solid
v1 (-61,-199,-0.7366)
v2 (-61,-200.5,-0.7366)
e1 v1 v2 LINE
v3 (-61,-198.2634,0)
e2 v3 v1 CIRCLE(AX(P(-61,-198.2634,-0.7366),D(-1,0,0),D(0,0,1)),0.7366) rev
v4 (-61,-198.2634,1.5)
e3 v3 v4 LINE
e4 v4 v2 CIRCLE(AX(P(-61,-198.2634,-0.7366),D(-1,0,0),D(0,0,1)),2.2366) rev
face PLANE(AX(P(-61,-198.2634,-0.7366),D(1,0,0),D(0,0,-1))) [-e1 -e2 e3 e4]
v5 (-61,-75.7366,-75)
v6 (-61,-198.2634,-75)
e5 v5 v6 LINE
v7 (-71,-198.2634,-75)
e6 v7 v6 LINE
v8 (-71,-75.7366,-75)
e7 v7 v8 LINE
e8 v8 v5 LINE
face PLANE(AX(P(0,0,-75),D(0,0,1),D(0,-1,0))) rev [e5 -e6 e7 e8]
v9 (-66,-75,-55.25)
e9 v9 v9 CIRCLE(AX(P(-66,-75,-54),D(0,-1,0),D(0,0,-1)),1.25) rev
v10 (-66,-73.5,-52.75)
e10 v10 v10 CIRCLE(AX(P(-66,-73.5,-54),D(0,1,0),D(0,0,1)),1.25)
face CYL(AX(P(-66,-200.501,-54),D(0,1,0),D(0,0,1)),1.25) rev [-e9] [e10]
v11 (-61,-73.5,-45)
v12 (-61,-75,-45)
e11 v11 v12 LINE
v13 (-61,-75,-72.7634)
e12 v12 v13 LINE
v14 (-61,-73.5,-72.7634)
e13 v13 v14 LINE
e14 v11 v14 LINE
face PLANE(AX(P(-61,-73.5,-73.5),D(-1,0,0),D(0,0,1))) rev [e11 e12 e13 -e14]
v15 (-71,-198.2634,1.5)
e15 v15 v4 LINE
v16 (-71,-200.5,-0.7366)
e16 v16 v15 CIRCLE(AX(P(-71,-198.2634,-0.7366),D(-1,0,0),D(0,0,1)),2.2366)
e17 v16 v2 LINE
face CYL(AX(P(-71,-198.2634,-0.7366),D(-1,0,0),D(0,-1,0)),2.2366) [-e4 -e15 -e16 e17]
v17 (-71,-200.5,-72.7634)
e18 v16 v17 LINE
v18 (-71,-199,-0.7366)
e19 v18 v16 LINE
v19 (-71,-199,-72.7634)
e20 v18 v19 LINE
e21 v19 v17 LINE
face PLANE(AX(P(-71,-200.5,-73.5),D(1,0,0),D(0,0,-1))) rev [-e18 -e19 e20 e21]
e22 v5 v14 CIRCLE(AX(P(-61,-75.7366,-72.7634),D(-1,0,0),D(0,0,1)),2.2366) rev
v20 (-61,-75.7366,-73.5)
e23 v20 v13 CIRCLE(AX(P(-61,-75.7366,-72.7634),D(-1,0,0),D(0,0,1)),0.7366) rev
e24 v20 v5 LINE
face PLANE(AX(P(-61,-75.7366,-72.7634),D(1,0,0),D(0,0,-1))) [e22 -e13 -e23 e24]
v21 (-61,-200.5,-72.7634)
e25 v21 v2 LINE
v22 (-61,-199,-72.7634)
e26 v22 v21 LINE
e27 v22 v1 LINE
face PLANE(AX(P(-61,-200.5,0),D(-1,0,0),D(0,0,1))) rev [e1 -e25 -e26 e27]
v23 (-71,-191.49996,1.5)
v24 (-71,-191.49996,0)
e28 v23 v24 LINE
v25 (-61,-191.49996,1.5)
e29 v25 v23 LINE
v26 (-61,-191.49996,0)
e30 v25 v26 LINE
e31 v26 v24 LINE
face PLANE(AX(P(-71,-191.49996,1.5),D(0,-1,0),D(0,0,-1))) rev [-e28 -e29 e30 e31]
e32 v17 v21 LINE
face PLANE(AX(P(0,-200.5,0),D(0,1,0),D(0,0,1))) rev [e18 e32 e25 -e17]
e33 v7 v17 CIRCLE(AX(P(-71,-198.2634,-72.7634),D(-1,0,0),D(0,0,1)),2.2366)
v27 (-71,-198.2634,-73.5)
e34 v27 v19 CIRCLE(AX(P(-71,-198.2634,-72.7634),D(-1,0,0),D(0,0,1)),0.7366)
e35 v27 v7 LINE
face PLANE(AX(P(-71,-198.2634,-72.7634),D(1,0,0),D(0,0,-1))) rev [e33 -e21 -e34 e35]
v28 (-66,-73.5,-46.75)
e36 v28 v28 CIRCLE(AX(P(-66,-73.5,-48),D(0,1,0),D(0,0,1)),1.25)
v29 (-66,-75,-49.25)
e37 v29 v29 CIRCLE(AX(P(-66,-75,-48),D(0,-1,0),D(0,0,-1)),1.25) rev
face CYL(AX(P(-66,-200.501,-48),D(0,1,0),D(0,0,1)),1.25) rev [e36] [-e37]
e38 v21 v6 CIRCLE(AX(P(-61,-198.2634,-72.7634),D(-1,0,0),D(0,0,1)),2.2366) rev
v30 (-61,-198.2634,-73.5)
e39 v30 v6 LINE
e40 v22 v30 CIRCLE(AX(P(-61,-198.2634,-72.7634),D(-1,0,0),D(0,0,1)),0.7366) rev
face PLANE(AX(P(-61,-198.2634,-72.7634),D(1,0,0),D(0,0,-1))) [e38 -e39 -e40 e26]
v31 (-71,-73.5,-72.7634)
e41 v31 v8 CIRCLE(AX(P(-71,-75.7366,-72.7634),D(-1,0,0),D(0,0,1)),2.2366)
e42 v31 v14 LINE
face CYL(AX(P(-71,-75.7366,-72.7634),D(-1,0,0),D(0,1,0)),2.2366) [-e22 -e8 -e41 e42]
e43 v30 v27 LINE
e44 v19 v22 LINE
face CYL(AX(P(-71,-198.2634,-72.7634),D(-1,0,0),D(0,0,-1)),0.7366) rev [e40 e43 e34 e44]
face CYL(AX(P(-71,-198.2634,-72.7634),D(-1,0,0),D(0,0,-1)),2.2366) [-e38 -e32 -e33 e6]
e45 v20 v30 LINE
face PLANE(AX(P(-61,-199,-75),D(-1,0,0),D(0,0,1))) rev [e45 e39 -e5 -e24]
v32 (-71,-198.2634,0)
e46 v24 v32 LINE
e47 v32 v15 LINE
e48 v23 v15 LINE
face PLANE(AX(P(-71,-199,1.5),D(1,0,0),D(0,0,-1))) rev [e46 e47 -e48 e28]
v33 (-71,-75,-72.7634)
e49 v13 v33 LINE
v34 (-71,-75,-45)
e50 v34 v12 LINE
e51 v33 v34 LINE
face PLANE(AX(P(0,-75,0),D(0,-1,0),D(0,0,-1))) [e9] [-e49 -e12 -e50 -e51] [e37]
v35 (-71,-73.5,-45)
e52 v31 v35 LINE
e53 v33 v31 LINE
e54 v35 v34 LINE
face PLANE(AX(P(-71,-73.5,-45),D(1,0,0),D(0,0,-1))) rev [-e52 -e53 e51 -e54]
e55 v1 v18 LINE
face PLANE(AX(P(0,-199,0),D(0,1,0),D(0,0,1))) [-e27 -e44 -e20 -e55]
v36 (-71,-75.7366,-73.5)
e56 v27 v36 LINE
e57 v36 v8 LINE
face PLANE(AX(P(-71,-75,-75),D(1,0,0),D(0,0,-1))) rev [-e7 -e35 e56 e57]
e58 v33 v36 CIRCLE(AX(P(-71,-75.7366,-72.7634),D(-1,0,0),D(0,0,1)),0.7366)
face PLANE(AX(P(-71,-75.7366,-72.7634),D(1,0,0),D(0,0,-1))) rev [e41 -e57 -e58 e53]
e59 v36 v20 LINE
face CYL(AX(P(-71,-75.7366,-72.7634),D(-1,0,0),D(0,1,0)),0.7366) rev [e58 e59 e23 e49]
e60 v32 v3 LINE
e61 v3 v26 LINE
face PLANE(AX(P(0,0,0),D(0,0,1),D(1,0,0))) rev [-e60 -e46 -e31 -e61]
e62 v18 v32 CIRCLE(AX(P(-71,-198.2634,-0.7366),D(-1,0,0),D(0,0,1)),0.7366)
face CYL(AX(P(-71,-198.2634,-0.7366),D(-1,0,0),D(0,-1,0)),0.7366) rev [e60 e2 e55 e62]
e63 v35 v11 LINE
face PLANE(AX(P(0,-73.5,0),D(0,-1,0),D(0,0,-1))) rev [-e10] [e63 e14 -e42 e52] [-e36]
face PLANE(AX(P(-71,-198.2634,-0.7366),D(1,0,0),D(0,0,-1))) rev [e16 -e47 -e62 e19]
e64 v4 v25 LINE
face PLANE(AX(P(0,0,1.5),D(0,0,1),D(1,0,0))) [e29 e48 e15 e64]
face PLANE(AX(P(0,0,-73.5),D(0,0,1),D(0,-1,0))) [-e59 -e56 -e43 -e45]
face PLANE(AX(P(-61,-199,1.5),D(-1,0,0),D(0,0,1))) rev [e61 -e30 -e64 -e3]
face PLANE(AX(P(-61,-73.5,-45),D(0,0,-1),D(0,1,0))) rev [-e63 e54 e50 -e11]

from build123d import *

# Parameters (mm, degrees)
SKETCH1_W                    = 10
SKETCH1_H                    = 7.500039556
BASE_FLANGE1_DEPTH           = 1.5
EDGE_FLANGE1_STRIP_W         = 7.4732
EDGE_FLANGE1_STRIP_H         = 1.5
EDGE_FLANGE1_STRIP_CUT_DEPTH = 10
EDGE_FLANGE1_DEPTH           = 10
EDGE_FLANGE2_STRIP_W         = 7.4732
EDGE_FLANGE2_STRIP_H         = 1.5
EDGE_FLANGE2_STRIP_CUT_DEPTH = 10
EDGE_FLANGE2_DEPTH           = 10
EDGE_FLANGE3_STRIP_W         = 7.4732
EDGE_FLANGE3_STRIP_H         = 1.5
EDGE_FLANGE3_STRIP_CUT_DEPTH = 10
EDGE_FLANGE3_DEPTH           = 10
CUT_EXTRUDE1_REACH           = 165.692
SKETCH15_R                   = 1.25


# Sheet-metal steps are written as plain solids
with BuildPart() as part:
    # Sketch1 → Base-Flange1 (new body)
    with BuildSketch(Plane.XY):
        with Locations((-66, -195.249980222)):
            Rectangle(SKETCH1_W, SKETCH1_H)
    extrude(amount=BASE_FLANGE1_DEPTH)

    # Edge-Flange1 strip (across the edge) → Edge-Flange1 strip cut (cut)
    with BuildSketch(Plane(origin=(-61, -199, 0), x_dir=(0, 1, 0), z_dir=(-1, 0, 0))):
        with Locations((-3, -0.75)):
            Rectangle(EDGE_FLANGE1_STRIP_W, EDGE_FLANGE1_STRIP_H)
    extrude(amount=EDGE_FLANGE1_STRIP_CUT_DEPTH, mode=Mode.SUBTRACT)

    # Edge-Flange1 section (across the edge) → Edge-Flange1 (add)
    with BuildSketch(Plane(origin=(-61, -199, 0), x_dir=(0, 1, 0), z_dir=(-1, 0, 0))):
        with BuildLine():
            Line((-1.5, 0.7366), (-1.5, 73.5))
            Line((-1.5, 73.5), (0, 73.5))
            Line((0, 73.5), (0, 0.7366))
            ThreePointArc((0, 0.7366), (0.215745145, 0.215745145), (0.7366, 0))
            Line((0.7366, 0), (0.7366, -1.5))
            ThreePointArc((0.7366, -1.5), (-0.844915027, -0.844915027), (-1.5, 0.7366))
        make_face()
    extrude(amount=EDGE_FLANGE1_DEPTH)

    # Edge-Flange2 strip (across the edge) → Edge-Flange2 strip cut (cut)
    with BuildSketch(Plane(origin=(-61, -199, -73.5), x_dir=(0, 0, 1), z_dir=(-1, 0, 0))):
        with Locations((-3, -0.75)):
            Rectangle(EDGE_FLANGE2_STRIP_W, EDGE_FLANGE2_STRIP_H)
    extrude(amount=EDGE_FLANGE2_STRIP_CUT_DEPTH, mode=Mode.SUBTRACT)

    # Edge-Flange2 section (across the edge) → Edge-Flange2 (add)
    with BuildSketch(Plane(origin=(-61, -199, -73.5), x_dir=(0, 0, 1), z_dir=(-1, 0, 0))):
        with BuildLine():
            Line((-1.5, 0.7366), (-1.5, 124))
            Line((-1.5, 124), (0, 124))
            Line((0, 124), (0, 0.7366))
            ThreePointArc((0, 0.7366), (0.215745145, 0.215745145), (0.7366, 0))
            Line((0.7366, 0), (0.7366, -1.5))
            ThreePointArc((0.7366, -1.5), (-0.844915027, -0.844915027), (-1.5, 0.7366))
        make_face()
    extrude(amount=EDGE_FLANGE2_DEPTH)

    # Edge-Flange3 strip (across the edge) → Edge-Flange3 strip cut (cut)
    with BuildSketch(Plane(origin=(-61, -75, -73.5), x_dir=(0, -1, 0), z_dir=(-1, 0, 0))):
        with Locations((-3, -0.75)):
            Rectangle(EDGE_FLANGE3_STRIP_W, EDGE_FLANGE3_STRIP_H)
    extrude(amount=EDGE_FLANGE3_STRIP_CUT_DEPTH, mode=Mode.SUBTRACT)

    # Edge-Flange3 section (across the edge) → Edge-Flange3 (add)
    with BuildSketch(Plane(origin=(-61, -75, -73.5), x_dir=(0, -1, 0), z_dir=(-1, 0, 0))):
        with BuildLine():
            Line((-1.5, 0.7366), (-1.5, 28.5))
            Line((-1.5, 28.5), (0, 28.5))
            Line((0, 28.5), (0, 0.7366))
            ThreePointArc((0, 0.7366), (0.215745145, 0.215745145), (0.7366, 0))
            Line((0.7366, 0), (0.7366, -1.5))
            ThreePointArc((0.7366, -1.5), (-0.844915027, -0.844915027), (-1.5, 0.7366))
        make_face()
    extrude(amount=EDGE_FLANGE3_DEPTH)

    # Sketch15 → Cut-Extrude1 (cut, up to next)
    with BuildSketch(Plane(origin=(0, -73.5, 0), x_dir=(1, 0, 0), z_dir=(0, 1, 0)), mode=Mode.PRIVATE) as cut_extrude1_sk1:
        with Locations(Location((-66, 48, 0), (0, 0, 270))):
            Circle(SKETCH15_R)
    cut_extrude1_tool1 = extrude(cut_extrude1_sk1.sketch, amount=-CUT_EXTRUDE1_REACH, mode=Mode.PRIVATE) & part.part
    # Sketch15 → Cut-Extrude1 (cut, up to next)
    with BuildSketch(Plane(origin=(0, -73.5, 0), x_dir=(1, 0, 0), z_dir=(0, 1, 0)), mode=Mode.PRIVATE) as cut_extrude1_sk2:
        with Locations(Location((-66, 54, 0), (0, 0, 270))):
            Circle(SKETCH15_R)
    cut_extrude1_tool2 = extrude(cut_extrude1_sk2.sketch, amount=-CUT_EXTRUDE1_REACH, mode=Mode.PRIVATE) & part.part
    add(cut_extrude1_tool1.solids().sort_by_distance((-66, -73.5, -48))[0], mode=Mode.SUBTRACT)
    add(cut_extrude1_tool2.solids().sort_by_distance((-66, -73.5, -54))[0], mode=Mode.SUBTRACT)


solid = part.part
